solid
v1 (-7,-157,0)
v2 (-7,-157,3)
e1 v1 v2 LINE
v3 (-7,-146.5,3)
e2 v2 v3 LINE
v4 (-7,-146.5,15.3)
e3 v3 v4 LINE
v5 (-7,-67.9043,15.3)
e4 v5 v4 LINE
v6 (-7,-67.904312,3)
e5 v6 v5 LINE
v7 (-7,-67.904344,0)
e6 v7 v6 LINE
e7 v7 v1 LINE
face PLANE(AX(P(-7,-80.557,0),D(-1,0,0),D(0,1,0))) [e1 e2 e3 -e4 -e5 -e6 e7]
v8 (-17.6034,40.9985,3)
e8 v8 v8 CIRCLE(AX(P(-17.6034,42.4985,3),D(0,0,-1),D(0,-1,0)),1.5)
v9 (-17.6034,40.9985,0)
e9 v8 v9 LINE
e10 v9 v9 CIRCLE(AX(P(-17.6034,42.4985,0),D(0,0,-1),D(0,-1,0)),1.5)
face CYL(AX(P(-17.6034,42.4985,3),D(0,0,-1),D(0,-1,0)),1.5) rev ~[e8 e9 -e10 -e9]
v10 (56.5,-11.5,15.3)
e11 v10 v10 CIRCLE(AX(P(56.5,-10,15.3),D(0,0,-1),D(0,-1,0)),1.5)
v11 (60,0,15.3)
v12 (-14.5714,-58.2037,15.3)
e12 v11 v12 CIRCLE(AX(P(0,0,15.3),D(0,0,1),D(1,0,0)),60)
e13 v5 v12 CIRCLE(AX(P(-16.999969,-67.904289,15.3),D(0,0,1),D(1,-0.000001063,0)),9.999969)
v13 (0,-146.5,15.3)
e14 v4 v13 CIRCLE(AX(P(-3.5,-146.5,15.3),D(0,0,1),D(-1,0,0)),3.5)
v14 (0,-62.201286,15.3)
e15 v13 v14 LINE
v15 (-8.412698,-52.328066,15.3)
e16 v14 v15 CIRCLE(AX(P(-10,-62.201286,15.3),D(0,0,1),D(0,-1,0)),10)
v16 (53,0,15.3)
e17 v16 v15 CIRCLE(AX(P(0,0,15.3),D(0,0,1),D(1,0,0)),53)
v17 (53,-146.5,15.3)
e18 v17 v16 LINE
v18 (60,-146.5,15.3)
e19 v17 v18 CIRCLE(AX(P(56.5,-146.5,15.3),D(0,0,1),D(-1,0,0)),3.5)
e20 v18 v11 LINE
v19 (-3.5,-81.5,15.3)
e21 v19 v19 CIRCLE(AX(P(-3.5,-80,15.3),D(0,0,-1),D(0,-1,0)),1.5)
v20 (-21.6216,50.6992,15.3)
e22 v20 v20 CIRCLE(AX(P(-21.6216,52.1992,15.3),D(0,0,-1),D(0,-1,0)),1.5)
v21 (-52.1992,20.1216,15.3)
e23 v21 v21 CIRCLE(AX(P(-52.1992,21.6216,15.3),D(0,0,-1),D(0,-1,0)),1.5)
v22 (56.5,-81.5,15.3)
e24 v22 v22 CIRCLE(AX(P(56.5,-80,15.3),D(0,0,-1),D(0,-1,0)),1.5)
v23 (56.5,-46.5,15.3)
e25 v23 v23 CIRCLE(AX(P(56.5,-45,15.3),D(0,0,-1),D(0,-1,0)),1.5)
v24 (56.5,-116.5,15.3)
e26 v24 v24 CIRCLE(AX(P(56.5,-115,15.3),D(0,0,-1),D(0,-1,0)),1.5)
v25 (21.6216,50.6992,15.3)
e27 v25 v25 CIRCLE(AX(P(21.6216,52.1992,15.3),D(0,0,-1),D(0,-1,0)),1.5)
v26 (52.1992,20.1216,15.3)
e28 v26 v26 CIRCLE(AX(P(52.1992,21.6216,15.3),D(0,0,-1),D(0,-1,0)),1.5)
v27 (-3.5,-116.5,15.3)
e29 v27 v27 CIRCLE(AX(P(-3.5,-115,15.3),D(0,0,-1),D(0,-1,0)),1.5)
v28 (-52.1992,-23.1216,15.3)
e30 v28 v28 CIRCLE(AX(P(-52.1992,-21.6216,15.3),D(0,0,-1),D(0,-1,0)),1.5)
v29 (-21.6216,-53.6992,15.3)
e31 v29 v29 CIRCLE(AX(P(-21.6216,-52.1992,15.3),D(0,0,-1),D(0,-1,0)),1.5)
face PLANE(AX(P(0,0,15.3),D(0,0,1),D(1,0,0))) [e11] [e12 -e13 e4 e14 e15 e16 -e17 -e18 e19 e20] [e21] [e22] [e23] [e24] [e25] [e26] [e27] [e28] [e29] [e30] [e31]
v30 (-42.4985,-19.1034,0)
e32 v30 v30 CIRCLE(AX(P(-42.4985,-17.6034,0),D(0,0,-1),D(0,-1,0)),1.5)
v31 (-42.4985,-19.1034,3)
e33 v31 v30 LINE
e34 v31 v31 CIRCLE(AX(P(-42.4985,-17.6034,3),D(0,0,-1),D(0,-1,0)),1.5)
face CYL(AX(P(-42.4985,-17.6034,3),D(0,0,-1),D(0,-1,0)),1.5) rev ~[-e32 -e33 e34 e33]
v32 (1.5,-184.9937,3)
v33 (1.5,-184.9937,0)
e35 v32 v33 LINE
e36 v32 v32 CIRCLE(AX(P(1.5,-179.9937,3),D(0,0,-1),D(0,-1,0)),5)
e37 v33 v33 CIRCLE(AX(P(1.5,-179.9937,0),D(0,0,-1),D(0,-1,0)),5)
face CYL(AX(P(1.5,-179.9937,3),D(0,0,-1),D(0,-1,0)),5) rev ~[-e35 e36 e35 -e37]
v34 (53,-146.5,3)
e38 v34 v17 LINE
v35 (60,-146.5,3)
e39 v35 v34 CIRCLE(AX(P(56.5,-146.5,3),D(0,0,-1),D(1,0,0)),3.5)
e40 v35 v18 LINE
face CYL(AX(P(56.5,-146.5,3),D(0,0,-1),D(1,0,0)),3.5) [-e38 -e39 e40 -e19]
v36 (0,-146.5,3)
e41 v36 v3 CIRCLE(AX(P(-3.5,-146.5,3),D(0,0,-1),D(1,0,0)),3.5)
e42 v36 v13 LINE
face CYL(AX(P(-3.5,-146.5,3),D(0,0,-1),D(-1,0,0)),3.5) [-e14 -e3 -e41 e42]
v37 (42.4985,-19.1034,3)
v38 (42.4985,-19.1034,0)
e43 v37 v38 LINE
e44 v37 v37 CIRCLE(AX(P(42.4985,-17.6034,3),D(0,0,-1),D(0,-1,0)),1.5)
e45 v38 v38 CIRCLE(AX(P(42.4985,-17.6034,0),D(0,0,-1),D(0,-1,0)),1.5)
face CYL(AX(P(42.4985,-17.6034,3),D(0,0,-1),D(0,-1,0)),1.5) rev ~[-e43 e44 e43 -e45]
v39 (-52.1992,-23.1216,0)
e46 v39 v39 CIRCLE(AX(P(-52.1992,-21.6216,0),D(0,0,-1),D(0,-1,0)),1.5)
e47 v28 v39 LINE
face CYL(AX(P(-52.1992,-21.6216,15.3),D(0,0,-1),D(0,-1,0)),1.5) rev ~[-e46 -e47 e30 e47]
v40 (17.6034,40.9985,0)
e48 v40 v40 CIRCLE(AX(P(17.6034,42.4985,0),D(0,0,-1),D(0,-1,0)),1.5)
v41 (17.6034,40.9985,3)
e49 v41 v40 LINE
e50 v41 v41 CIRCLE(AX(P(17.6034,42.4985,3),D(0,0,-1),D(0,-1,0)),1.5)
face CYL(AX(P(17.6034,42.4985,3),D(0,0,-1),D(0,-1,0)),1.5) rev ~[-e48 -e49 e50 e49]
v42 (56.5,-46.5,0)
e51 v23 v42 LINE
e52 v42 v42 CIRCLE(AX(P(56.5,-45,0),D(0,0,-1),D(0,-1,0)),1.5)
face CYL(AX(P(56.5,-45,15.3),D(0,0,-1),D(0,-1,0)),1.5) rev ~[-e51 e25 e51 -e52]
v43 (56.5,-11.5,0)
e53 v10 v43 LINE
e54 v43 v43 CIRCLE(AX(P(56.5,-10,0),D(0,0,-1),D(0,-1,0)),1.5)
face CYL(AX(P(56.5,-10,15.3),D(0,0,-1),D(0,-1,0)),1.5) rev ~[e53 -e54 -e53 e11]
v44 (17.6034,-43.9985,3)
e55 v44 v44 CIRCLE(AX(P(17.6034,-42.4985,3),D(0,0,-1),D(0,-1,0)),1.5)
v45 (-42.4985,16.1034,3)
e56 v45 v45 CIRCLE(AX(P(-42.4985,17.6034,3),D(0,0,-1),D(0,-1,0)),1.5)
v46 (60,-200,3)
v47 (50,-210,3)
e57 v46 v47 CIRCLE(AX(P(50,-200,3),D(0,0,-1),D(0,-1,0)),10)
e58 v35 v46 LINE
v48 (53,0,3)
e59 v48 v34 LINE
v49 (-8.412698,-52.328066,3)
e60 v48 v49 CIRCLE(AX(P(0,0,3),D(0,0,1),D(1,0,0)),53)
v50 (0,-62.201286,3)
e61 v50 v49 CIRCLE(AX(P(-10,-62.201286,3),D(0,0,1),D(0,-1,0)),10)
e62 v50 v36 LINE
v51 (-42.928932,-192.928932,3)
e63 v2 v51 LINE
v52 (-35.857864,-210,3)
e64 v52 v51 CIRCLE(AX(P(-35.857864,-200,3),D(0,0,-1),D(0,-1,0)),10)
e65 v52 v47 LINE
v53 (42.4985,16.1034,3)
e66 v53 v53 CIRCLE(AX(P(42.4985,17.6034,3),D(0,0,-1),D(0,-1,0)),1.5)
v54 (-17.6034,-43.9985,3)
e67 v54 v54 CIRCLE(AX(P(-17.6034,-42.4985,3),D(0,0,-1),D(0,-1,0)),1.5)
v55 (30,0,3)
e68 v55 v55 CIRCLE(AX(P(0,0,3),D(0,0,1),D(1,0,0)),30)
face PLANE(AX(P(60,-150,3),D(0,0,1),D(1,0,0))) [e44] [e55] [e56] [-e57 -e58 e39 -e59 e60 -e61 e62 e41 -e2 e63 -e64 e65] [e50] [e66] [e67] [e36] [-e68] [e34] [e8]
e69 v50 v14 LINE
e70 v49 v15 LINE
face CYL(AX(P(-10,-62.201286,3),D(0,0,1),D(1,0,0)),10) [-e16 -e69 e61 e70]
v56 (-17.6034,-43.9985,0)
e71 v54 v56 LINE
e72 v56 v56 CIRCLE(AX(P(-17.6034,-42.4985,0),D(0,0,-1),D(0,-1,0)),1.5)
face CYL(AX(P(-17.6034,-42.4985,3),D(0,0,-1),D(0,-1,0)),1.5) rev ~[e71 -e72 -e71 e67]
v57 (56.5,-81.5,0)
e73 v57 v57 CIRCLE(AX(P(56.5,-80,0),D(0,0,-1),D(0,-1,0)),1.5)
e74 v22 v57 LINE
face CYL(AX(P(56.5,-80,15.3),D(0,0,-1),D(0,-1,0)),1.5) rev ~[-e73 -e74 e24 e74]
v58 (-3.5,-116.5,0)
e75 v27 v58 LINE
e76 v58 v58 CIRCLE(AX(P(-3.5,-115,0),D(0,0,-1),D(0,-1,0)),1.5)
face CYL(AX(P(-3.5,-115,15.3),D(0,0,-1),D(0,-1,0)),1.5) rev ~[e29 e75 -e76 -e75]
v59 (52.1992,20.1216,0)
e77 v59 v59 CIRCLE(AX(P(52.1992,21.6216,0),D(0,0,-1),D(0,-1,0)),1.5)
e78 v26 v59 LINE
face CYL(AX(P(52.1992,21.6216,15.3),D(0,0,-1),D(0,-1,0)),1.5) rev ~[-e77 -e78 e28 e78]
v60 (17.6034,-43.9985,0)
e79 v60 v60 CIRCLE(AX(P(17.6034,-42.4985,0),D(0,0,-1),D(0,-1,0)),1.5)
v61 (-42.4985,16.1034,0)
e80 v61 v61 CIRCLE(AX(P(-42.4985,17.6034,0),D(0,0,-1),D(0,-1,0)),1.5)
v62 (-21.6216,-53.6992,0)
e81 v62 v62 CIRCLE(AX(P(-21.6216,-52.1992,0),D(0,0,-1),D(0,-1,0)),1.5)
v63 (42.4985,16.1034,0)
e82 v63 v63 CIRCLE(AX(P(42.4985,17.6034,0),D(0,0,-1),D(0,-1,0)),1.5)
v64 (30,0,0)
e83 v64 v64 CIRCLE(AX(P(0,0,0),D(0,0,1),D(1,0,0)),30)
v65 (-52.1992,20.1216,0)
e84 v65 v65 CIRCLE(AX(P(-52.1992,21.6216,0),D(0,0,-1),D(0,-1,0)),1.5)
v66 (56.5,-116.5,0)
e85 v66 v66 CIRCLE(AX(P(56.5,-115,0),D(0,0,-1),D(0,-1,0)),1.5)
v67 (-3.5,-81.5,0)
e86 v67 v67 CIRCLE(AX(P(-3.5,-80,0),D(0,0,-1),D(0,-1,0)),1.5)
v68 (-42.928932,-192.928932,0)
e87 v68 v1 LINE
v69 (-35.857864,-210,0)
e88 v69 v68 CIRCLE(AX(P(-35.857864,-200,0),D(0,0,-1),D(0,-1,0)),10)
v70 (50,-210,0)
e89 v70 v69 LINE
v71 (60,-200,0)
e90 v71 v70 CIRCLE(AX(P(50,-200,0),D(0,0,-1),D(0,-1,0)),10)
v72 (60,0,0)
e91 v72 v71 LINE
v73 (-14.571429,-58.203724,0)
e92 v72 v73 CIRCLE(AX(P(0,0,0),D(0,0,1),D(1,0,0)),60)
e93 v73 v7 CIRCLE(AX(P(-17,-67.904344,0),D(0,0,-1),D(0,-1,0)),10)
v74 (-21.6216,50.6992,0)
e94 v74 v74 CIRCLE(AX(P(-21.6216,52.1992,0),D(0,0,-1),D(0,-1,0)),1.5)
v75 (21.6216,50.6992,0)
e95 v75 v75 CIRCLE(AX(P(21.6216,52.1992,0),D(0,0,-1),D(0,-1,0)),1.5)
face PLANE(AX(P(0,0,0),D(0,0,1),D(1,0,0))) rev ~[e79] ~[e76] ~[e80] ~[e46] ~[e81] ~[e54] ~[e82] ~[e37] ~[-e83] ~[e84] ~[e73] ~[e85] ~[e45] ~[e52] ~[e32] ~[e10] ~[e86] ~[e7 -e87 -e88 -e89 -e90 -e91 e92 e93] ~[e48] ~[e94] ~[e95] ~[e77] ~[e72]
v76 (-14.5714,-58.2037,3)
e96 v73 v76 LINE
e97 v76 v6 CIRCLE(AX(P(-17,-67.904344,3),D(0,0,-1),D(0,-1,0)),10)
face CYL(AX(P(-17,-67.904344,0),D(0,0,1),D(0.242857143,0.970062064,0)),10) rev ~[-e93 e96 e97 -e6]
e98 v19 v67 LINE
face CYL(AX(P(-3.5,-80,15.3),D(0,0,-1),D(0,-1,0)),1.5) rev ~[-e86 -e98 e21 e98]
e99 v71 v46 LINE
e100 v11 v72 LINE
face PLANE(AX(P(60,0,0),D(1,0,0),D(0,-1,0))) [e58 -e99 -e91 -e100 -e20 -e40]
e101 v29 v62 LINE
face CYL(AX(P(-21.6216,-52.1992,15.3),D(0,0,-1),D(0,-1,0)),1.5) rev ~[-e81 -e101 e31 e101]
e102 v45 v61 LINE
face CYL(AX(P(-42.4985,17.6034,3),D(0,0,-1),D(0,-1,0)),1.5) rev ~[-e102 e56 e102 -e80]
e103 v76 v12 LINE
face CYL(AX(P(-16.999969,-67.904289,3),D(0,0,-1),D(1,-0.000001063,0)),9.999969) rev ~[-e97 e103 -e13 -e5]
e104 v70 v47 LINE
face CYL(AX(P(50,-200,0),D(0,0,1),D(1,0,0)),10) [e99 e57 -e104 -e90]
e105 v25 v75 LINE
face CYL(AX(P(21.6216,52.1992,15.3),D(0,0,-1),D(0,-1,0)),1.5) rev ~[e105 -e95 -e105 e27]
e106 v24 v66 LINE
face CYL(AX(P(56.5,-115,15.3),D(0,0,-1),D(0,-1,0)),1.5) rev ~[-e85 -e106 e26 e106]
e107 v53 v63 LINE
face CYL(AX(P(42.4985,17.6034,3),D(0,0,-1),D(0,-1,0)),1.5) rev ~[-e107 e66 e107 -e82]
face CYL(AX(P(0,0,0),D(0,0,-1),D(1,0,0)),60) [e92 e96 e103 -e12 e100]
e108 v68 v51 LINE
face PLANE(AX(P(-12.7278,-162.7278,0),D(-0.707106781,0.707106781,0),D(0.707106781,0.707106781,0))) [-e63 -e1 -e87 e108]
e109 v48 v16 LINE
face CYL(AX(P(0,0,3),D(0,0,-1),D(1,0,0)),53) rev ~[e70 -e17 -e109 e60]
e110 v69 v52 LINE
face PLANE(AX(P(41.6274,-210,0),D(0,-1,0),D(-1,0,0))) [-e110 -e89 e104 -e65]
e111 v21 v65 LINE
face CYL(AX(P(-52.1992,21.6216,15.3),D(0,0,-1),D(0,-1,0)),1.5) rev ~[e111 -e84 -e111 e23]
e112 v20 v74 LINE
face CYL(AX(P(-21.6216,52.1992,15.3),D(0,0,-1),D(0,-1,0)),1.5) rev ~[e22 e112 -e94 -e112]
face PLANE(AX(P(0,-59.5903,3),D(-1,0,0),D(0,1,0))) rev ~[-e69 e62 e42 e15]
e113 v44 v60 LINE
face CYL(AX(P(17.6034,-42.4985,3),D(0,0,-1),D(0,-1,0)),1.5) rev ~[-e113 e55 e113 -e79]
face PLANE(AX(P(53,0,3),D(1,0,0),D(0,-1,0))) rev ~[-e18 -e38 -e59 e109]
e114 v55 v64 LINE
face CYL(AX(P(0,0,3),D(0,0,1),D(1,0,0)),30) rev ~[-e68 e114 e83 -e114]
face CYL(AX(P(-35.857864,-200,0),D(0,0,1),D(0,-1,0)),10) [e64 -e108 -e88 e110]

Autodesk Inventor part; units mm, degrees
ref_plane "YZ Plane" through (0, 0, 0) normal (1, 0, 0) x (0, 1, 0)
ref_plane "XZ Plane" through (0, 0, 0) normal (0, 1, 0) x (-1, 0, 0)
ref_plane "XY Plane" through (0, 0, 0) normal (0, 0, 1) x (1, 0, 0)
sketch "スケッチ1" plane through (0, 0, 0) normal (0, 0, 1) x (1, 0, 0)
  circle A0 centre (0, 0) radius 60
  circle A1 centre (0, 0) radius 7
  dimension "d0" = 120
  dimension "d1" = 14
extrude "押し出し1" add sketch "スケッチ1" along normal blind 3
sketch "スケッチ2" plane through (0, 0, 3) normal (0, 0, 1) x (1, 0, 0)
  circle A0 centre (0, 0) radius 46
  line L0 (0, 0) -> (0, 59.211)
  line L1 (0, 0) -> (-21.8609, 52.777)
  line L2 (0, 0) -> (27.8226, 47.8581)
  point P0 (-17.6034, 42.4985)
  point P1 (-42.4985, 17.6034)
  point P2 (-42.4985, -17.6034)
  point P3 (-17.6034, -42.4985)
  point P4 (17.6034, -42.4985)
  point P5 (42.4985, -17.6034)
  point P6 (42.4985, 17.6034)
  point P7 (17.6034, 42.4985)
  dimension "d4" = 92
  dimension "d5" = 22.5
  dimension "d8" = 360
hole "穴1" at (-17.6034, 42.4985, 3) at (-42.4985, 17.6034, 3) at (-42.4985, -17.6034, 3) at (-17.6034, -42.4985, 3) at (17.6034, -42.4985, 3) at (42.4985, -17.6034, 3) at (42.4985, 17.6034, 3) at (17.6034, 42.4985, 3) direction (0, 0, -1) diameter 3 end through all
sketch "スケッチ4" plane through (0, 0, 0) normal (0, 0, -1) x (-1, 0, 0)
  line L0 (0, 0) -> (0, -80.557)
  circle A0 centre (0, 0) radius 60 projected
  line L1 (-60, 0) -> (-60, -210)
  line L2 (60, 0) -> (60, -210)
  line L3 (-60, -210) -> (60, -210)
  line L4 (-60, 0) -> (-41.6274, -210)
  line L5 (60, 0) -> (41.6274, -210)
  line L6 (12.7278, -162.7278) -> (60, -210)
  line L7 (19.706, -169.706) -> (-7.6224, -142.3776)
  line L8 (0, -80.557) -> (0, -150)
  line L9 (7, -239.3448) -> (7, -80.557)
  line L10 (7, -80.557) -> (7, 0)
  line L11 (7, -239.3448) -> (7, -157)
  circle A1 centre (0, 0) radius 7 projected
  point P0 (60, 0)
  point P1 (60, 0)
  point P2 (-59.0885, -10.4189)
  point P3 (-58.5, -13.3323)
  point P4 (57, -18.735)
  point P5 (59.0885, -10.4189)
  point P6 (7, -136.3384)
  point P7 (7, -59.5903)
  point P8 (43.1055, -193.1055)
  point P9 (7, -210)
  point P10 (7, -136.3384)
  point P11 (7, -157)
  dimension "d21" = 60
  dimension "d23" = 120
  dimension "d24" = 210
  dimension "d25" = 210
  dimension "d56" = 0
  dimension "d89" = 85
  dimension "d90" = 85
  dimension "d207" = 45
  dimension "d208" = 7
extrude "押し出し3" add sketch "スケッチ4" against normal blind 3 contours A0 L10 L9 L7 L8 L0 | L0 L8 L7 L9 L3 L4 A0 | L4 L3 L1 A0 | L7 L6 L5 L3 L9 | L6 L3 L5
sketch "スケッチ17" plane through (0, 0, 3) normal (0, 0, 1) x (1, 0, 0)
  circle A0 centre (0, 0) radius 30
  dimension "d159" = 60
extrude "押し出し10" cut sketch "スケッチ17" against normal blind 10
sketch "スケッチ20" plane through (0, 0, 3) normal (0, 0, 1) x (1, 0, 0)
  line L0 (-60, -210) -> (60, -210) projected
  circle A0 centre (0, 0) radius 30 projected
  line L1 (60, -210) -> (60, 0) projected
  point P0 (1.5, -179.9937)
  point P1 (0, -210)
  point P2 (58.5, -136.6677)
  point P3 (51.5, -210)
  point P4 (48.5, -124.0626)
  point P5 (60, -150)
  dimension "d205" = 180
  dimension "d223" = 58.5
  dimension "d246" = 60
hole "穴8" at (1.5, -179.9937, 3) direction (0, 0, -1) diameter 10 end through all
fillet "フィレット4" radius 10 2 edges at (-60, -210, 1.5) (60, -210, 1.5)
fillet "フィレット5" radius 10 2 edges at (-7, -59.5903, 1.5) (60, 0, 1.5)
sketch "スケッチ23" plane through (0, 0, 3) normal (0, 0, 1) x (1, 0, 0)
  circle A0 centre (0, 0) radius 60
  circle A1 centre (0, 0) radius 53
  arc A2 (-7, -67.9043) -> (-14.5714, -58.2037) centre (-17, -67.9043) ccw projected
  line L0 (-7, -67.9043) -> (-7, -157)
  line L1 (60, -157) -> (60, 0)
  line L2 (0, -157) -> (0, -60)
  line L3 (-7, -67.9043) -> (-7, -59.5903)
  line L4 (53, 0) -> (53, -150)
  line L5 (53, -150) -> (0, -150)
  line L6 (0, -150) -> (0, -67.9043)
  line L7 (0, -67.9043) -> (0, -59.5903)
  line L8 (53, -150) -> (53, -157)
  line L9 (0, -59.5903) -> (0, -53)
  line L10 (-35.8579, -210) -> (50, -210) projected
  line L11 (-7, -150) -> (60, -150)
  point P0 (-7, -112.4522)
  point P1 (53, 0)
  point P2 (53, -28.1247)
  dimension "d247" = 120
  dimension "d248" = 7
  dimension "d249" = 7
  dimension "d250" = 7
  dimension "d267" = 60
extrude "押し出し14" add sketch "スケッチ23" along normal blind 12.3 contours A0 L4 A1 L9 L7 | L1 L11 L4 A0 | A0 L3 A2 | A0 L2 L11 L0 L3 picked at (54.2848, -15.7658)
sketch "スケッチ24" plane through (0, 0, 15.3) normal (0, 0, 1) x (1, 0, 0)
  circle A0 centre (0, 0) radius 60
  circle A1 centre (0, 0) radius 56.5
  circle A2 centre (-17.6034, 42.4985) radius 1.5 projected
  line L0 (0, 0) -> (-17.6034, 42.4985)
  line L1 (-17.6034, 42.4985) -> (-25.261, 60.9855)
  point P0 (-21.6216, 52.1992)
  point P1 (-52.1992, 21.6216)
  point P2 (-52.1992, -21.6216)
  point P3 (-21.6216, -52.1992)
  point P4 (21.6216, -52.1992)
  point P5 (52.1992, -21.6216)
  point P6 (52.1992, 21.6216)
  point P7 (21.6216, 52.1992)
  dimension "d253" = 120
  dimension "d254" = 3.5
  dimension "d257" = 360
hole "穴10" at (-21.6216, -52.1992, 15.3) at (-52.1992, -21.6216, 15.3) at (-52.1992, 21.6216, 15.3) at (-21.6216, 52.1992, 15.3) at (21.6216, 52.1992, 15.3) at (52.1992, 21.6216, 15.3) direction (0, 0, -1) diameter 3 end through all
sketch "スケッチ25" plane through (0, 0, 15.3) normal (0, 0, 1) x (1, 0, 0)
  line L0 (-7, -150) -> (0, -150) projected
  line L1 (-7, -67.9043) -> (-7, -150) projected
  line L2 (60, -150) -> (60, 0) projected
  line L3 (53, -150) -> (60, -150) projected
  point P0 (0, 0)
  point P1 (-3.5, -80)
  point P2 (56.5, -80)
  point P3 (-3.5, -115)
  point P4 (56.5, -115)
  point P5 (56.5, -45)
  point P6 (56.5, -10)
  point P7 (-3.5, -150)
  point P8 (56.5, -150)
  dimension "d268" = 35
  dimension "d269" = 35
  dimension "d270" = 3.5
  dimension "d271" = 3.5
  dimension "d272" = 3.5
  dimension "d273" = 3.5
  dimension "d274" = 3.5
  dimension "d275" = 3.5
  dimension "d276" = 35
  dimension "d277" = 35
  dimension "d278" = 35
  dimension "d279" = 35
hole "穴11" at (-3.5, -80, 15.3) at (56.5, -80, 15.3) at (-3.5, -115, 15.3) at (56.5, -115, 15.3) at (56.5, -45, 15.3) at (56.5, -10, 15.3) direction (0, 0, -1) diameter 3 end through all
fillet "フィレット8" radius 3.5 4 edges at (-7, -150, 9.15) (0, -150, 9.15) (53, -150, 9.15) (60, -150, 9.15)
fillet "フィレット9" radius 10 1 edges at (0, -53, 9.15)
equation "\"d25\" = d24"
equation "\"d90\" = d89"
properties part number "legparts_08(seven)" material "ABS プラスチック"
